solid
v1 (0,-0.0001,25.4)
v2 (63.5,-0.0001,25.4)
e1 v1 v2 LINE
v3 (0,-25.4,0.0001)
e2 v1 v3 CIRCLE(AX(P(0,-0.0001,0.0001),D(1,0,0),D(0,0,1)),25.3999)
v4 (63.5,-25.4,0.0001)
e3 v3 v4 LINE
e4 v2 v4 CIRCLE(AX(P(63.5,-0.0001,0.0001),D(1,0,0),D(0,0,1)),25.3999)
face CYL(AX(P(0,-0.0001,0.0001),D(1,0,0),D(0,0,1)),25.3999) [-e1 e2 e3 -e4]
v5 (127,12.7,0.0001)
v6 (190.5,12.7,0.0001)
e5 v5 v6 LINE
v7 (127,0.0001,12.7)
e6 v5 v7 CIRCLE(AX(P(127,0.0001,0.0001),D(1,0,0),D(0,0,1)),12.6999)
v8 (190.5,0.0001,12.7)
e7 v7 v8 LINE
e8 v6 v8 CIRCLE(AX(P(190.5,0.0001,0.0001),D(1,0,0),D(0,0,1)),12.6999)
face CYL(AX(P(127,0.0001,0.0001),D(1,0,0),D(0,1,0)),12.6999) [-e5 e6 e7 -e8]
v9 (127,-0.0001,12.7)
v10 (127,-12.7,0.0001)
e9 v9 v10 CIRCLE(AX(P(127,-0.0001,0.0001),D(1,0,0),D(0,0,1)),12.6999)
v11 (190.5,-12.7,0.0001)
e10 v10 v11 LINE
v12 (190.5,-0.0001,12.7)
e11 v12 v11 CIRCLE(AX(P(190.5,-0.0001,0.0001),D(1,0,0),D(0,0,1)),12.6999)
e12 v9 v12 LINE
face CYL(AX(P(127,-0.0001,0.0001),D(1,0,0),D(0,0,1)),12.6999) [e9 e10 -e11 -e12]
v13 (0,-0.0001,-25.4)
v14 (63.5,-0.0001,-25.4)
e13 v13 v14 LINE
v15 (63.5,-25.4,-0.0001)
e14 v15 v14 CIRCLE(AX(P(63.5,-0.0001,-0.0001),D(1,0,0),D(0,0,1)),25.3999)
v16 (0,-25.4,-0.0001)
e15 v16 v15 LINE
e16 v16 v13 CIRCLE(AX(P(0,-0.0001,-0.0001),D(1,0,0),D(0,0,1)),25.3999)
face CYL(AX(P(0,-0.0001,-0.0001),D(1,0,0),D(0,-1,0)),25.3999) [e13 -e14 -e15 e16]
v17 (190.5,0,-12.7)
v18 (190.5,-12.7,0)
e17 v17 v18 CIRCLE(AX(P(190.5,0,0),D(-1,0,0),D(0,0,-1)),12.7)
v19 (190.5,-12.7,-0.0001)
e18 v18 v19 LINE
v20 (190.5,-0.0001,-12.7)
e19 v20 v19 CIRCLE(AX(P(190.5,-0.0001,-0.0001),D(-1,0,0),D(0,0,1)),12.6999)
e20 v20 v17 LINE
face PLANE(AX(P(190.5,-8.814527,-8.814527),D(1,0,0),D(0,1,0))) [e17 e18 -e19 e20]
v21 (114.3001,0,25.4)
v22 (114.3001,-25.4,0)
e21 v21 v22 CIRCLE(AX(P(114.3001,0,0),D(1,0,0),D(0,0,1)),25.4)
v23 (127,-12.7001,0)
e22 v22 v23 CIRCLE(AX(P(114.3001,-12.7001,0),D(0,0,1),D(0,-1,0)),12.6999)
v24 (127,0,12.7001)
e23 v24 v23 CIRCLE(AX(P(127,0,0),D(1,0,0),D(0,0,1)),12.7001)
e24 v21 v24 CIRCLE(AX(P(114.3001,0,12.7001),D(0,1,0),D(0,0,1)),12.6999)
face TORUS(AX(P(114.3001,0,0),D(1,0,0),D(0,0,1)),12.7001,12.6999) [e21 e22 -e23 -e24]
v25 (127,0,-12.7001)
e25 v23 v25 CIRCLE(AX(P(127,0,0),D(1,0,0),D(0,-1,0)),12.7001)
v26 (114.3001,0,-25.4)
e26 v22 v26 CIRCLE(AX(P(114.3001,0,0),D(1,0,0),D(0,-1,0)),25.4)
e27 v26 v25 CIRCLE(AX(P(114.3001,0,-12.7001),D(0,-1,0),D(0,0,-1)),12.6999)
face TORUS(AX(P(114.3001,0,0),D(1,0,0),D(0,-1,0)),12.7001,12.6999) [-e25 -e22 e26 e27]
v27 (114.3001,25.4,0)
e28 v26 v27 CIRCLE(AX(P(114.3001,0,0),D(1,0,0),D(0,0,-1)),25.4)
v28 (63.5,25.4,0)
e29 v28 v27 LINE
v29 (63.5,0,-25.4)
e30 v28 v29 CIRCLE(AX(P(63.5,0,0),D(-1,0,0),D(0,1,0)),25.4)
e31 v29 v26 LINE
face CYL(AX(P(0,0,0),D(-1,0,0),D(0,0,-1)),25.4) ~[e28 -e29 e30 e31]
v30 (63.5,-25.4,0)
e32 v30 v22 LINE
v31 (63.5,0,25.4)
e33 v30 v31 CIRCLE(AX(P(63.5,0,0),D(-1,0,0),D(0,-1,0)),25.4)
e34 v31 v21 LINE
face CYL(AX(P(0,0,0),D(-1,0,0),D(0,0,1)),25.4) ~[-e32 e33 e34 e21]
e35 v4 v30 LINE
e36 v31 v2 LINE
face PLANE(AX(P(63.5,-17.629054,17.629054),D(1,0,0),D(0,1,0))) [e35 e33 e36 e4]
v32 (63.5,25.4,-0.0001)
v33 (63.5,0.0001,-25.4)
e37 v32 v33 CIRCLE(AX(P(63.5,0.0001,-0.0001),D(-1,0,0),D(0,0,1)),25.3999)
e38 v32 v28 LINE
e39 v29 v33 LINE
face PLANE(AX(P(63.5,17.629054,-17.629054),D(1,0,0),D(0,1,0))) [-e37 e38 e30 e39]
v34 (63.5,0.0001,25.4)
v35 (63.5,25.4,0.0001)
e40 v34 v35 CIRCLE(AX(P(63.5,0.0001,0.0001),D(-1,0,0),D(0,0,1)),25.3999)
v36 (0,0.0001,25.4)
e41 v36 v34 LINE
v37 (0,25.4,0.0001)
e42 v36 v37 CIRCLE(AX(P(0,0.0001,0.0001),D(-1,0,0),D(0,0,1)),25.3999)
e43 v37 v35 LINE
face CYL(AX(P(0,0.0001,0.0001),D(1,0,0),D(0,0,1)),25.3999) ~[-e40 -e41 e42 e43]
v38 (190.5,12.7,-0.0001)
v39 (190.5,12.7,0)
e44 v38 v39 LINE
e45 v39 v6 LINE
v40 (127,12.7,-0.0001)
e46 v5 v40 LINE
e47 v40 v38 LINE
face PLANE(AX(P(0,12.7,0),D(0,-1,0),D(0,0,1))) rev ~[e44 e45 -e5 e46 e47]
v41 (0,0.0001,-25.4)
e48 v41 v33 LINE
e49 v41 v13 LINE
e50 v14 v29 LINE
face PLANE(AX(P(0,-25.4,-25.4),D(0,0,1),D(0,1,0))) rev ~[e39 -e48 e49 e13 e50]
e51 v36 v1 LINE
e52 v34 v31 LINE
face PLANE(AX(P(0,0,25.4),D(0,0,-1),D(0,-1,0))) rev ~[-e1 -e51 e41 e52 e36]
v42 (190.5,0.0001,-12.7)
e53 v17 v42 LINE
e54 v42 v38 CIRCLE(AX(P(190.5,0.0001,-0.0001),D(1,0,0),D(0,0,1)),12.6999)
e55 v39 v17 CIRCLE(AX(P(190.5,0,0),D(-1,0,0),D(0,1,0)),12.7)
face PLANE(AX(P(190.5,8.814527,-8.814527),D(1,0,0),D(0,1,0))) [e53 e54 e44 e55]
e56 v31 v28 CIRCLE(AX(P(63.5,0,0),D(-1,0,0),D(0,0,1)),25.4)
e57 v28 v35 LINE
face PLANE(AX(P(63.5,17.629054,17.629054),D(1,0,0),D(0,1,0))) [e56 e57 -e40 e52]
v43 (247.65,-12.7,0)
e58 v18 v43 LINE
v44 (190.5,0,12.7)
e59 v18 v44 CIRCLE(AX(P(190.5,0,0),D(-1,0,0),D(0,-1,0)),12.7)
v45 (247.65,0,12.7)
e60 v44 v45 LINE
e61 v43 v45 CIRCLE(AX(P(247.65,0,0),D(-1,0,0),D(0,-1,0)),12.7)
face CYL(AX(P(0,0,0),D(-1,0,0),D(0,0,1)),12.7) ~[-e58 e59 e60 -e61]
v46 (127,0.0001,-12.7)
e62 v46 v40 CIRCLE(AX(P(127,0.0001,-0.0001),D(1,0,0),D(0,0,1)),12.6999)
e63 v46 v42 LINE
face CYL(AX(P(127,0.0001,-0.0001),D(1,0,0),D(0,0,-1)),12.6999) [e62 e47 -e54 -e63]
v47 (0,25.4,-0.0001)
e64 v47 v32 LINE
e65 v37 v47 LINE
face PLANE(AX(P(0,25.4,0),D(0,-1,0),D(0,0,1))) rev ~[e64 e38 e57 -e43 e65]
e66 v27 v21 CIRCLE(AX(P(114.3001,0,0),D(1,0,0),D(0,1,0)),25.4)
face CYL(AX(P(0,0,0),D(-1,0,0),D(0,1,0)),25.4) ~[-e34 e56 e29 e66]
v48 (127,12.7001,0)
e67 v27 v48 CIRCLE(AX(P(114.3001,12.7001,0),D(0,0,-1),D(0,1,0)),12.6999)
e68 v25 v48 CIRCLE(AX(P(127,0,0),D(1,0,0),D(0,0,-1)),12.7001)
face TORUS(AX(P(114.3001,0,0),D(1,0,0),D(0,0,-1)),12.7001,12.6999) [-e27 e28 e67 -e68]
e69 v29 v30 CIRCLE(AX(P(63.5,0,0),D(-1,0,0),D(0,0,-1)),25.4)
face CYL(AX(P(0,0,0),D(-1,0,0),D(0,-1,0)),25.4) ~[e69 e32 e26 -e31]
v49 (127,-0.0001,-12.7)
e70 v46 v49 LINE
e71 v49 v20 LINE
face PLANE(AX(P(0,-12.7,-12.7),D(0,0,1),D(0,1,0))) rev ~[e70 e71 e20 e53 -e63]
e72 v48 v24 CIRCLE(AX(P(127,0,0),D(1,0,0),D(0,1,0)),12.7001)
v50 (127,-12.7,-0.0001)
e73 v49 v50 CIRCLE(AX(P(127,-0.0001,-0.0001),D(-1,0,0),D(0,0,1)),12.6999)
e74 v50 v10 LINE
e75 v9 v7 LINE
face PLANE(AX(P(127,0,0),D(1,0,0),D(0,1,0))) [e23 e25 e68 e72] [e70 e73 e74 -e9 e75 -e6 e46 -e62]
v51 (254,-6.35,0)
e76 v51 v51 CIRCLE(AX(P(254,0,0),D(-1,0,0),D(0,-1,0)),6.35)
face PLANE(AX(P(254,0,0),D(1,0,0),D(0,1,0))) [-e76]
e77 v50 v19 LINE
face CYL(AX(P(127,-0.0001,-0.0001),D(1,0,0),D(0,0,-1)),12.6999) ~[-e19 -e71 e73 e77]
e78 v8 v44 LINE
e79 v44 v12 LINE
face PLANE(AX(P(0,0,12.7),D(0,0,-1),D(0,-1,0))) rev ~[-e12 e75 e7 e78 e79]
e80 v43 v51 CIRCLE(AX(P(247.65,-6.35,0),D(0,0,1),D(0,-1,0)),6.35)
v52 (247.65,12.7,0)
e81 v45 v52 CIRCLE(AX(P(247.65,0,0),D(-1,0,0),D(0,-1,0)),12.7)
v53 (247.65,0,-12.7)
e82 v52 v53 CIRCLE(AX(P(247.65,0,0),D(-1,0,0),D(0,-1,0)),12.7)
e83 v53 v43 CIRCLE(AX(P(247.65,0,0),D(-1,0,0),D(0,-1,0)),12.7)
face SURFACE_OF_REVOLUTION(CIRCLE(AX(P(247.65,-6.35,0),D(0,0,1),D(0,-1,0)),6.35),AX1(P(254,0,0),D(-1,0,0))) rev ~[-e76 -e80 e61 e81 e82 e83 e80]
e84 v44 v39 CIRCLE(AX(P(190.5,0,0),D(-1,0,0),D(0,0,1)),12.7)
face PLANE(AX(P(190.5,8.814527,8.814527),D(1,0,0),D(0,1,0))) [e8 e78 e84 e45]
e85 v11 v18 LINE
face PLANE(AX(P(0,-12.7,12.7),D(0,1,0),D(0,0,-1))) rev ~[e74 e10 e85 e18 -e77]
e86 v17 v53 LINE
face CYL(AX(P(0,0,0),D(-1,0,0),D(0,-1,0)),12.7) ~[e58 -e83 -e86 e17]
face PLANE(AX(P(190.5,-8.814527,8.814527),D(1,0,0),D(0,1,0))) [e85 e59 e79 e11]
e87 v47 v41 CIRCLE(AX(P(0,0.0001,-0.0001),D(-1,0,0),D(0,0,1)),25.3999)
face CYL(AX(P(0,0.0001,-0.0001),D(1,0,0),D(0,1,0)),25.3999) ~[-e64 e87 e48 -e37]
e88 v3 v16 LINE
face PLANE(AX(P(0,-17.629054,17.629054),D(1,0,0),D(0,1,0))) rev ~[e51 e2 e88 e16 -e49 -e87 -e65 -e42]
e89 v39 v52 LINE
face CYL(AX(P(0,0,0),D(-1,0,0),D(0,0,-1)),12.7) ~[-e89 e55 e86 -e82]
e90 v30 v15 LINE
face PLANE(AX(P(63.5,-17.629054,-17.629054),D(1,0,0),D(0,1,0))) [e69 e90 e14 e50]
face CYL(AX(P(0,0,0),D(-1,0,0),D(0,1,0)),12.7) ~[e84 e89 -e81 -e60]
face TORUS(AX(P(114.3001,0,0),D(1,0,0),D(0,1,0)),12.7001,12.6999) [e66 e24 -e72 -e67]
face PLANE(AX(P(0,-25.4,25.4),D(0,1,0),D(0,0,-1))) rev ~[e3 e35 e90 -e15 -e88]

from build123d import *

# Parameters (mm, degrees)
F1_DEPTH = 254
F2_DEPTH = 190.5
F3_DEPTH = 127
F4_DEPTH = 63.5
F5_R     = 12.6999
F6_R     = 25.3999
F7_R     = 12.6999


# Not quite as in the source:
# - a fillet or chamfer that OpenCascade refuses, or shapes differently, is made with other operations: its cross-section is extruded or revolved along the edge and cut away or added
# - a fillet or chamfer is up to 0.001 mm smaller than in the source, because OpenCascade refuses the exact size


with BuildPart() as f1:
    # F0 (on Right) → F1 (new body)
    with BuildSketch(Plane.YZ):
        with BuildLine():
            ThreePointArc((12.7, 0), (8.9802561211, 8.9802561211), (0, 12.7))
            ThreePointArc((0, 12.7), (-8.9802561211, 8.9802561211), (-12.7, 0))
            ThreePointArc((-12.7, 0), (-8.9802561211, -8.9802561211), (0, -12.7))
            ThreePointArc((0, -12.7), (8.9802561211, -8.9802561211), (12.7, 0))
        make_face()
    extrude(amount=F1_DEPTH)

    # F0 (on Right) → F2 (join)
    with BuildSketch(Plane.YZ):
        with BuildLine():
            ThreePointArc((-12.7, 0), (-8.9802561211, 8.9802561211), (0, 12.7))
            Line((0, 12.7), (-12.7, 12.7))
            Line((-12.7, 12.7), (-12.7, 0))
        make_face()
        with BuildLine():
            Line((12.7, 12.7), (0, 12.7))
            ThreePointArc((0, 12.7), (8.9802561211, 8.9802561211), (12.7, 0))
            Line((12.7, 0), (12.7, 12.7))
        make_face()
        with BuildLine():
            Line((12.7, -12.7), (12.7, 0))
            ThreePointArc((12.7, 0), (8.9802561211, -8.9802561211), (0, -12.7))
            Line((0, -12.7), (12.7, -12.7))
        make_face()
        with BuildLine():
            ThreePointArc((0, -12.7), (-8.9802561211, -8.9802561211), (-12.7, 0))
            Line((-12.7, 0), (-12.7, -12.7))
            Line((-12.7, -12.7), (0, -12.7))
        make_face()
    extrude(amount=F2_DEPTH)

    # F0 (on Right) → F3 (join)
    with BuildSketch(Plane.YZ):
        with BuildLine():
            ThreePointArc((25.4, 0), (17.9605122421, 17.9605122421), (0, 25.4))
            ThreePointArc((0, 25.4), (-17.9605122421, 17.9605122421), (-25.4, 0))
            ThreePointArc((-25.4, 0), (-17.9605122421, -17.9605122421), (0, -25.4))
            ThreePointArc((0, -25.4), (17.9605122421, -17.9605122421), (25.4, 0))
        make_face()
        Polygon((-12.7, 12.7), (0, 12.7), (12.7, 12.7), (12.7, 0), (12.7, -12.7), (0, -12.7), (-12.7, -12.7), (-12.7, 0), align=None, mode=Mode.SUBTRACT)
    extrude(amount=F3_DEPTH)

    # F0 (on Right) → F4 (join)
    with BuildSketch(Plane.YZ):
        with BuildLine():
            ThreePointArc((-25.4, 0), (-17.9605122421, 17.9605122421), (0, 25.4))
            Line((0, 25.4), (-25.4, 25.4))
            Line((-25.4, 25.4), (-25.4, 0))
        make_face()
        with BuildLine():
            ThreePointArc((0, -25.4), (-17.9605122421, -17.9605122421), (-25.4, 0))
            Line((-25.4, 0), (-25.4, -25.4))
            Line((-25.4, -25.4), (0, -25.4))
        make_face()
        with BuildLine():
            Line((25.4, -25.4), (25.4, 0))
            ThreePointArc((25.4, 0), (17.9605122421, -17.9605122421), (0, -25.4))
            Line((0, -25.4), (25.4, -25.4))
        make_face()
        with BuildLine():
            Line((25.4, 25.4), (0, 25.4))
            ThreePointArc((0, 25.4), (17.9605122421, 17.9605122421), (25.4, 0))
            Line((25.4, 0), (25.4, 25.4))
        make_face()
    extrude(amount=F4_DEPTH)

    # F5 (radius 12.7 in the source; OpenCascade refuses exactly that, so slightly less here)
    f5_edges = [f1.edges().sort_by_distance(p)[0] for p in [
        (158.75, -12.7, -12.7),
        (158.75, 12.7, -12.7),
        (158.75, 12.7, 12.7),
        (158.75, -12.7, 12.7),
    ]]
    fillet(f5_edges, radius=F5_R)

    # F6 (radius 25.4 in the source; OpenCascade refuses exactly that, so slightly less here)
    f6_edges = [f1.edges().sort_by_distance(p)[0] for p in [
        (31.75, -25.4, -25.4),
        (31.75, 25.4, -25.4),
        (31.75, -25.4, 25.4),
        (31.75, 25.4, 25.4),
    ]]
    fillet(f6_edges, radius=F6_R)

    # F7 (radius 12.7 in the source; OpenCascade refuses exactly that, so slightly less here)
    f7_edges = [f1.edges().sort_by_distance(p)[0] for p in [
        (127, 25.4, 0),
    ]]
    fillet(f7_edges, radius=F7_R)

    # F8: fillet of radius 6.35 on 1 edges, made by hand

    # F8_s1 → F8_t2 (revolve, cut)
    with BuildSketch(Plane.XY):
        with BuildLine():
            ThreePointArc((247.65, -12.7), (252.1401280605, -10.8401280605), (254, -6.35))
            Line((254, -6.35), (254, -12.7))
            Line((254, -12.7), (247.65, -12.7))
        make_face()
    revolve(axis=Axis((254, 0, 0), (-1, 0, 0)), mode=Mode.SUBTRACT)


solid = f1.part
